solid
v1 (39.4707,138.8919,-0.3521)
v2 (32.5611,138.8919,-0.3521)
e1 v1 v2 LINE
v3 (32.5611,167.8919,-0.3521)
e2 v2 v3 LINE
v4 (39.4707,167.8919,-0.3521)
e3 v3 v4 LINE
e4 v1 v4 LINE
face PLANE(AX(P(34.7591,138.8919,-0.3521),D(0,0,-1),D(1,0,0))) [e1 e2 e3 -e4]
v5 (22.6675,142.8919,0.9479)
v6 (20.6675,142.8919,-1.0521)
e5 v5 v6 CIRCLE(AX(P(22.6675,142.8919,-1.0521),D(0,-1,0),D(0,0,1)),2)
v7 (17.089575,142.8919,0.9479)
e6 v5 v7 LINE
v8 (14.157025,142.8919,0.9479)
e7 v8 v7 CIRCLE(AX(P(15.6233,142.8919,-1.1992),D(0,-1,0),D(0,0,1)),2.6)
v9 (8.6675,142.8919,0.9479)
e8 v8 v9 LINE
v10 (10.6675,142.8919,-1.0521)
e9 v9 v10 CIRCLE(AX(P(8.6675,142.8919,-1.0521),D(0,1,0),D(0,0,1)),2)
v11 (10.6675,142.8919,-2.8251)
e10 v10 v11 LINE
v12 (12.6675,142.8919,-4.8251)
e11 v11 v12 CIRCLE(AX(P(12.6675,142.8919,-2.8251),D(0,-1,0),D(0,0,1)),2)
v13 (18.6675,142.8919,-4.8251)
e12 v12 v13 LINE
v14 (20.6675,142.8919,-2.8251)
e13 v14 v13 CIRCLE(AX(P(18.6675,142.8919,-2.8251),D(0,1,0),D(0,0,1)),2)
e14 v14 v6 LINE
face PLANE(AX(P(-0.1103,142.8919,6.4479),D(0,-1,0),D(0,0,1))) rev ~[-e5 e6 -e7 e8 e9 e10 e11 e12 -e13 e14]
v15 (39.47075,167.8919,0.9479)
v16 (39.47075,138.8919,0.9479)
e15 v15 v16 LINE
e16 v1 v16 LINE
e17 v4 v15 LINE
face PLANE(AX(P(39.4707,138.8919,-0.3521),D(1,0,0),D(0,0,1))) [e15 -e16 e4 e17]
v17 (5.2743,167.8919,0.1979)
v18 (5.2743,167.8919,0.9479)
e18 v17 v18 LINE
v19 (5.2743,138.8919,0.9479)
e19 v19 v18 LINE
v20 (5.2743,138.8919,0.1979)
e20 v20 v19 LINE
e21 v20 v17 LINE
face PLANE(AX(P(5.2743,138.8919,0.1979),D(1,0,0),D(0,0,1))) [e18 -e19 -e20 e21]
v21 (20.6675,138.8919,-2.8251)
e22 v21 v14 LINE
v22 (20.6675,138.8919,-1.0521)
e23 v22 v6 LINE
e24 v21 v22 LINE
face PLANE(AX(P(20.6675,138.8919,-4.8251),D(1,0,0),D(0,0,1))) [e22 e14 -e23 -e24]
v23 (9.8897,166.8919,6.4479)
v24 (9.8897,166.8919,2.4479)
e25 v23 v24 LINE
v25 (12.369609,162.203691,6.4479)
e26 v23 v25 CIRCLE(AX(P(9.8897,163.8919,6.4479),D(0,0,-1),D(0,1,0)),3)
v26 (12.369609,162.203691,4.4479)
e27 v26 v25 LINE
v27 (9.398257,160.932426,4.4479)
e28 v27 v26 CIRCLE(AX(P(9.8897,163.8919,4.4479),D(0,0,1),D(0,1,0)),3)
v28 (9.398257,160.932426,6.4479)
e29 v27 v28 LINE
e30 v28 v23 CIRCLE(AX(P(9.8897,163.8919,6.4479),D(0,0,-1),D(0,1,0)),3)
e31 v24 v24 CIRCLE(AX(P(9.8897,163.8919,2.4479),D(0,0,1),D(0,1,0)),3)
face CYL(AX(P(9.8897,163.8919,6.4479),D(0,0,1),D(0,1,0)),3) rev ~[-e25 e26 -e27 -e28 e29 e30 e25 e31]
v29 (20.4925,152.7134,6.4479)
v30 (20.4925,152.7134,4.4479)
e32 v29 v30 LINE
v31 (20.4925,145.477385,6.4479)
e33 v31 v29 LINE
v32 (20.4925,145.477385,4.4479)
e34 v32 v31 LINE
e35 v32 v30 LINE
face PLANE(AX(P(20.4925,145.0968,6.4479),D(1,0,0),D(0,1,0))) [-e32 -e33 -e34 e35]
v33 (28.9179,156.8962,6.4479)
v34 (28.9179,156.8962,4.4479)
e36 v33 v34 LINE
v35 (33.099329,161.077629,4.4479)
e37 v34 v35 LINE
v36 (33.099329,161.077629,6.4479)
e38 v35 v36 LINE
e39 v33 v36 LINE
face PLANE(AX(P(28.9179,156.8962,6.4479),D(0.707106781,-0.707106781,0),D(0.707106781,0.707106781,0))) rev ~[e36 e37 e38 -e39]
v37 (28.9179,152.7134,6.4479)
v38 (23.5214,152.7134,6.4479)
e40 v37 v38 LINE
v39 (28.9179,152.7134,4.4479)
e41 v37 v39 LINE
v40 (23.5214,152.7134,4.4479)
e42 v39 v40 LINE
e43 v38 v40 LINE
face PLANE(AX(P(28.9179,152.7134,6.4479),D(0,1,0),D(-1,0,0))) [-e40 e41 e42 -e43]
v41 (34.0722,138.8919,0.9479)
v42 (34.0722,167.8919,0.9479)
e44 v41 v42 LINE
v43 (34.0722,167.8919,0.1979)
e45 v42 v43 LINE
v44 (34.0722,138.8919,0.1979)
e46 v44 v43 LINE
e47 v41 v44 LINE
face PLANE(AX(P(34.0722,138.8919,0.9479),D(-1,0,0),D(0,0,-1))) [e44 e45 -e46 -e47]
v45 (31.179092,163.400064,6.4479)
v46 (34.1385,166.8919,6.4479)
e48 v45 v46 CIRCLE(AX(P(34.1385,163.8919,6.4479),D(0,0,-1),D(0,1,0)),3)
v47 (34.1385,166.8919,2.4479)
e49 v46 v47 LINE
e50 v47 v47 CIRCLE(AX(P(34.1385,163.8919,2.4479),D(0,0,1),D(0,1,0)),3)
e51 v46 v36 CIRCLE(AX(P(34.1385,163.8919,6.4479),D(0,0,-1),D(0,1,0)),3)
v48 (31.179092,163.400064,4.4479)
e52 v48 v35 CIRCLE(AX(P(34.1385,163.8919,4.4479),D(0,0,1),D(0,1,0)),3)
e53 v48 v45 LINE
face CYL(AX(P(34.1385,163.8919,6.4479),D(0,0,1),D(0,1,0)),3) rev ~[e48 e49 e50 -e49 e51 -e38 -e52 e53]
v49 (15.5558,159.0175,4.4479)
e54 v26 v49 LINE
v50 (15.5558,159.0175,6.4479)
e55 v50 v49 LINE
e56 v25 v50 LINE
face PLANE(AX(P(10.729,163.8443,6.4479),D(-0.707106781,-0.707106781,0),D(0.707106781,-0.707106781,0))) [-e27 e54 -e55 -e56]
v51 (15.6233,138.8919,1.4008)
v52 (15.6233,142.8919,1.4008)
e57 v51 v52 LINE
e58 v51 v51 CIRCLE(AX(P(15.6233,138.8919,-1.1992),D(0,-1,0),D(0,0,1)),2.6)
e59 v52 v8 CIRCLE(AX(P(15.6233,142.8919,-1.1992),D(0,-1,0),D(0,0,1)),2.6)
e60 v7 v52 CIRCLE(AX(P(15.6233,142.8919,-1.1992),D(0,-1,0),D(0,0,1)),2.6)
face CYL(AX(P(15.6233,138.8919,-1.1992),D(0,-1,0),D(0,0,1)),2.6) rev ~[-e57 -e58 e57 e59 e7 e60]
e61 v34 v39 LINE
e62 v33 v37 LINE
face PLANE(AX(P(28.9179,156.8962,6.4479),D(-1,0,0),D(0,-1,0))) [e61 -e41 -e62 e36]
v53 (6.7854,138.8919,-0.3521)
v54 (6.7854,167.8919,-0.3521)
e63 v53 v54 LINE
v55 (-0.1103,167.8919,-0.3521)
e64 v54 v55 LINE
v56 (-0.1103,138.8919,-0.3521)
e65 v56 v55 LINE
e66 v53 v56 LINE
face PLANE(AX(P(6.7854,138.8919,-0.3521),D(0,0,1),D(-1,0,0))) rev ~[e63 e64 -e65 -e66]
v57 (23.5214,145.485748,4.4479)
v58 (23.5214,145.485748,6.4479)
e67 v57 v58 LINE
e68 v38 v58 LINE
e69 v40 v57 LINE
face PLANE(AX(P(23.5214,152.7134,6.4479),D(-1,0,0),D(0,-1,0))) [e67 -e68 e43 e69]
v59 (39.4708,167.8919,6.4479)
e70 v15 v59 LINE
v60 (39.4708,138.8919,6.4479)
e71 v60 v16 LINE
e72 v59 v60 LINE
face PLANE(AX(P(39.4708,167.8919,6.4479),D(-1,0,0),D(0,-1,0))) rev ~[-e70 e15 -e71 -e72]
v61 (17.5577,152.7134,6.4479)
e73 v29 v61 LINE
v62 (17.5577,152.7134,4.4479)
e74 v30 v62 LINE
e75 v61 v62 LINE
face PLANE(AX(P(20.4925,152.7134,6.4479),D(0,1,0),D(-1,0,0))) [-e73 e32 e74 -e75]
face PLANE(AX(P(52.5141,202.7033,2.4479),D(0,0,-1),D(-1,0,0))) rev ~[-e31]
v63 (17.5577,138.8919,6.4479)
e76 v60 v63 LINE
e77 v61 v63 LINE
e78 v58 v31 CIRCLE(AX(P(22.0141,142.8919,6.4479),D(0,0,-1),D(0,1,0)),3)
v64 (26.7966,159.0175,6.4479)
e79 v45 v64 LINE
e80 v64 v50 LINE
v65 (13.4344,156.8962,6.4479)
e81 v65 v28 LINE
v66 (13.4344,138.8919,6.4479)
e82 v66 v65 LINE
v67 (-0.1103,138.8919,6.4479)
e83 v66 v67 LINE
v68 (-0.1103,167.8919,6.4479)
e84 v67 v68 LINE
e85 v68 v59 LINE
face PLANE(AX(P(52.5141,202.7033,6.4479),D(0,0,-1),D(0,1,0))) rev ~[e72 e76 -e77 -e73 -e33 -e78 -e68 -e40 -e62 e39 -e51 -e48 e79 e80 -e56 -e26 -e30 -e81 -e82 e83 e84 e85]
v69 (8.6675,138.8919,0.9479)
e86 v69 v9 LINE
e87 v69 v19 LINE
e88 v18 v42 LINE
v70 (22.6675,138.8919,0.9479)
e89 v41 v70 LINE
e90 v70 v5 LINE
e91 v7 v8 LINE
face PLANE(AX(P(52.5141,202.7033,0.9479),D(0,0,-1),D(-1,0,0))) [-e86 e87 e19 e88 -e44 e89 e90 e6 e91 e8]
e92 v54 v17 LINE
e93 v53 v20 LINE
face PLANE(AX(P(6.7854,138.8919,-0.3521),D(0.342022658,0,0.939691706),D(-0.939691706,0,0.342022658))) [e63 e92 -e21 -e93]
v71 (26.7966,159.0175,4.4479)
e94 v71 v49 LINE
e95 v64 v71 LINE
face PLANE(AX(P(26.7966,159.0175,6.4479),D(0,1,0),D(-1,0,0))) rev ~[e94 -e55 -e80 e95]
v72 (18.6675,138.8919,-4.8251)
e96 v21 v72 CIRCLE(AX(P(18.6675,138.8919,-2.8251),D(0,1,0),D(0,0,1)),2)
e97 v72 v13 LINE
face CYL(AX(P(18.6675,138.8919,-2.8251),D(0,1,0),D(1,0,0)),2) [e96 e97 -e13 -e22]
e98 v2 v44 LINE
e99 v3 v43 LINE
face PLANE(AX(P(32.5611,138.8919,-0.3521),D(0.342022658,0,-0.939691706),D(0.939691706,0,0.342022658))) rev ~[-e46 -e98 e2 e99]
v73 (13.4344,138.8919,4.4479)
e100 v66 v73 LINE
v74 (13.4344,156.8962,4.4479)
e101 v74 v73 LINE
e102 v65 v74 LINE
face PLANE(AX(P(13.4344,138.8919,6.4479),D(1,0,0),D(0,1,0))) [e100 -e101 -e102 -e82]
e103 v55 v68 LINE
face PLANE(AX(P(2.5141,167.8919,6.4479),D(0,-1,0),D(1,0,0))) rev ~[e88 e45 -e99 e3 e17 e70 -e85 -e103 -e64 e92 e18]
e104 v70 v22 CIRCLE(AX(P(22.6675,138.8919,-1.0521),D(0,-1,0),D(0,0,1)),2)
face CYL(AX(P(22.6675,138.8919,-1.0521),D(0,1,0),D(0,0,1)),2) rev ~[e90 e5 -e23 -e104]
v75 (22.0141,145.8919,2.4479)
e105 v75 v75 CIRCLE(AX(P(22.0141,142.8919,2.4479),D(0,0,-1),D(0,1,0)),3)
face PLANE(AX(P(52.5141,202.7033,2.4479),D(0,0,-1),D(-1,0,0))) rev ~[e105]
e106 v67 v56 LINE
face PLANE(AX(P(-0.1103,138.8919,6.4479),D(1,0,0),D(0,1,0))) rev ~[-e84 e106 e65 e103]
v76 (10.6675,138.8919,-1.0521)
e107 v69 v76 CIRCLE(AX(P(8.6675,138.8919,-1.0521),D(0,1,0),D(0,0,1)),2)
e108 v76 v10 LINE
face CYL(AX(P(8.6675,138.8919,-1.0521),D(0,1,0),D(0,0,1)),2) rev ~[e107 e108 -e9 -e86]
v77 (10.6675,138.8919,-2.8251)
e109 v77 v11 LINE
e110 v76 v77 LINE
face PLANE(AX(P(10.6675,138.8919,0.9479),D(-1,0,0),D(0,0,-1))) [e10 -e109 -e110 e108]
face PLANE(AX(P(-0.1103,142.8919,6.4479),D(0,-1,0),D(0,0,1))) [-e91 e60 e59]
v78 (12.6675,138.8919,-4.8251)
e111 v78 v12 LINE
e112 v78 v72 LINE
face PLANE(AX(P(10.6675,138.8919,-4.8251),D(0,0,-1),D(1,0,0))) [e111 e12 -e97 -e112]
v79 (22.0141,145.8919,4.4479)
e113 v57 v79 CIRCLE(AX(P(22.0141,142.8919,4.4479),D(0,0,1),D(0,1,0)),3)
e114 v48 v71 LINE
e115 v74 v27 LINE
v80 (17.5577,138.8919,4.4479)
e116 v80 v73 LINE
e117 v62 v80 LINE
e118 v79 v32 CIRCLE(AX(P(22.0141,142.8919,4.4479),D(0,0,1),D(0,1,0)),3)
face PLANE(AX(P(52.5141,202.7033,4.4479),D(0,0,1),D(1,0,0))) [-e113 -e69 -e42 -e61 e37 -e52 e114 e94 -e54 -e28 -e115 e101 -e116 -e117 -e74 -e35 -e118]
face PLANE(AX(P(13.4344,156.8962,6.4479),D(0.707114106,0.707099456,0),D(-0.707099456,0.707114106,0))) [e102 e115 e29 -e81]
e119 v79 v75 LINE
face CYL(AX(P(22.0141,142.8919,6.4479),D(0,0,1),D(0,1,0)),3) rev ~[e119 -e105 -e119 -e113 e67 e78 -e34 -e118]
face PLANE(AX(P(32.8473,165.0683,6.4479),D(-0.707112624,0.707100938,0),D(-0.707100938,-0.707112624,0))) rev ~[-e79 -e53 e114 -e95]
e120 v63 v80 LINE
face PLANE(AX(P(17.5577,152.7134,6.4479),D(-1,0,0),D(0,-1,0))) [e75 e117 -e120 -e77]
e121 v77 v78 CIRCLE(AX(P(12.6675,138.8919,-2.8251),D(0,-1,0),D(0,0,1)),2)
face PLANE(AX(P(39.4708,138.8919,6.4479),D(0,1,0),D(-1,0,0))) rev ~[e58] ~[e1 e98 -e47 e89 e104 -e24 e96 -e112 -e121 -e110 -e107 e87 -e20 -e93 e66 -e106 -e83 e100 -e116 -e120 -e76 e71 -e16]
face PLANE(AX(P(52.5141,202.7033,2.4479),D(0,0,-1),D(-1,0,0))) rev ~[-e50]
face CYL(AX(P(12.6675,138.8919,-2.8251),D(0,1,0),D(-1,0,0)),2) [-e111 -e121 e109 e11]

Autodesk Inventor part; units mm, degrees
ref_plane "YZ Plane" through (0, 0, 0) normal (1, 0, 0) x (0, 1, 0)
ref_plane "XZ Plane" through (0, 0, 0) normal (0, 1, 0) x (-1, 0, 0)
ref_plane "XY Plane" through (0, 0, 0) normal (0, 0, 1) x (1, 0, 0)
ref_plane "Work Plane1" through (52.5141, 202.7033, 6.4479) normal (0, 0, -1) x (0, 1, 0)
sketch "Sketch1" plane through (52.5141, 202.7033, 6.4479) normal (0, 0, -1) x (0, 1, 0)
  circle A0 centre (-59.8114, -30.5) radius 1.4 construction
  circle A1 centre (-38.8114, -18.3756) radius 1.4 projected
  circle A2 centre (-38.8114, -42.6244) radius 1.4 construction
  circle A3 centre (41, 0) radius 1.65 projected
  circle A4 centre (-9, 0) radius 1.65 projected
  circle A5 centre (-9, 50) radius 1.65 projected
  circle A6 centre (41, 50) radius 1.65 projected
  circle A7 centre (16, 50) radius 1.65 projected
  circle A8 centre (-9, 25) radius 1.65 projected
  circle A9 centre (16, 0) radius 1.65 projected
  circle A10 centre (41, 25) radius 1.65 projected
  line L0 (80, 55) -> (-80, 55) projected
  line L1 (-80, 55) -> (-80, -55) projected
  line L2 (-80, -55) -> (80, -55) projected
  line L3 (80, -55) -> (80, 55) projected
  line L4 (-36.5, 0) -> (-36.5, -50) projected
  line L5 (-14, 0) -> (-36.5, 0) projected
  line L6 (-14, -5) -> (-14, 0) projected
  line L7 (72, -5) -> (-14, -5) projected
  line L8 (72, -50) -> (72, -5) projected
  line L9 (-36.5, -50) -> (72, -50) projected
  line L10 (-4, 45) -> (-4, 5) projected
  line L11 (36, 45) -> (-4, 45) projected
  line L12 (36, 5) -> (36, 45) projected
  line L13 (-4, 5) -> (36, 5) projected
  line L14 (-64.5989, -17.0433) -> (-64.5989, -57.0433) construction
  line L15 (-64.5989, -57.0433) -> (-34.5989, -57.0433) construction
  line L16 (-34.5989, -57.0433) -> (-34.5989, -17.0433) construction
  line L17 (-34.5989, -17.0433) -> (-64.5989, -17.0433) construction
  line L18 (-34.8114, -13.0433) -> (-63.8114, -13.0433)
  line L19 (-63.8114, -13.0433) -> (-63.8114, -52.6244)
  line L20 (-63.8114, -52.6244) -> (-34.8114, -52.6244)
  line L21 (-34.8114, -52.6244) -> (-34.8114, -13.0433)
  circle A11 centre (-59.8114, -30.5) radius 3
  circle A12 centre (-38.8114, -18.3756) radius 3
  circle A13 centre (-38.8114, -42.6244) radius 3 construction
  line L22 (-36.5, -35.1157) -> (-41.75, -35.1157) construction
  line L23 (-41.75, -35.1157) -> (-41.75, -38.5657) construction
  line L24 (-41.75, -38.5657) -> (-56.86, -38.5657) construction
  line L25 (-56.86, -38.5657) -> (-56.86, -35.1157) construction
  line L26 (-56.86, -35.1157) -> (-60.26, -35.1157) construction
  line L27 (-60.26, -35.1157) -> (-60.26, -52.0657) construction
  line L28 (-60.26, -52.0657) -> (-36.5, -52.0657) construction
  line L29 (-36.5, -52.0657) -> (-36.5, -35.1157) construction
  line L30 (-41.75, -28.3657) -> (-36.5, -28.3657) construction
  line L31 (-36.5, -28.3657) -> (-36.5, -25.0657) construction
  line L32 (-36.5, -25.0657) -> (-60.26, -25.0657) construction
  line L33 (-60.26, -25.0657) -> (-60.26, -28.3657) construction
  line L34 (-60.26, -28.3657) -> (-56.86, -28.3657) construction
  line L35 (-56.86, -28.3657) -> (-56.86, -27.0942) construction
  line L36 (-56.86, -27.0942) -> (-41.75, -27.0942) construction
  line L37 (-41.75, -27.0942) -> (-41.75, -28.3657) construction
  line L38 (-56.86, -35.1157) -> (-60.26, -35.1157) construction
  line L39 (-56.86, -38.5657) -> (-56.86, -35.1157) construction
  line L40 (-41.75, -38.5657) -> (-56.86, -38.5657) construction
  line L41 (-41.75, -35.1157) -> (-41.75, -38.5657) construction
  line L42 (-36.5, -35.1157) -> (-41.75, -35.1157) construction
  line L43 (-36.5, -35.05) -> (-36.5, -35.1157) construction
  line L44 (-36.5, -35.05) -> (-56.86, -35.05) construction
  line L45 (-36.5, -34.78) -> (-36.5, -35.05) construction
  line L46 (-36.5, -34.78) -> (-56.86, -34.78) construction
  line L47 (-36.5, -34.51) -> (-36.5, -34.78) construction
  line L48 (-36.5, -34.51) -> (-56.86, -34.51) construction
  line L49 (-36.5, -34.24) -> (-36.5, -34.51) construction
  line L50 (-36.5, -34.24) -> (-56.86, -34.24) construction
  line L51 (-36.5, -33.97) -> (-36.5, -34.24) construction
  line L52 (-36.5, -33.97) -> (-56.86, -33.97) construction
  line L53 (-36.5, -33.7) -> (-36.5, -33.97) construction
  line L54 (-36.5, -33.7) -> (-56.86, -33.7) construction
  line L55 (-36.5, -33.43) -> (-36.5, -33.7) construction
  line L56 (-36.5, -33.43) -> (-56.86, -33.43) construction
  line L57 (-36.5, -33.16) -> (-36.5, -33.43) construction
  line L58 (-36.5, -33.16) -> (-56.86, -33.16) construction
  line L59 (-36.5, -32.89) -> (-36.5, -33.16) construction
  line L60 (-36.5, -32.89) -> (-56.86, -32.89) construction
  line L61 (-36.5, -32.62) -> (-36.5, -32.89) construction
  line L62 (-36.5, -32.62) -> (-56.86, -32.62) construction
  line L63 (-36.5, -32.35) -> (-36.5, -32.62) construction
  line L64 (-36.5, -32.35) -> (-56.86, -32.35) construction
  line L65 (-36.5, -32.08) -> (-36.5, -32.35) construction
  line L66 (-36.5, -32.08) -> (-56.86, -32.08) construction
  line L67 (-36.5, -31.81) -> (-36.5, -32.08) construction
  line L68 (-36.5, -31.81) -> (-56.86, -31.81) construction
  line L69 (-36.5, -31.54) -> (-36.5, -31.81) construction
  line L70 (-36.5, -31.54) -> (-56.86, -31.54) construction
  line L71 (-36.5, -31.27) -> (-36.5, -31.54) construction
  line L72 (-36.5, -31.27) -> (-56.86, -31.27) construction
  line L73 (-36.5, -31) -> (-36.5, -31.27) construction
  line L74 (-36.5, -31) -> (-56.86, -31) construction
  line L75 (-36.5, -30.73) -> (-36.5, -31) construction
  line L76 (-36.5, -30.73) -> (-56.86, -30.73) construction
  line L77 (-36.5, -30.46) -> (-36.5, -30.73) construction
  line L78 (-36.5, -30.46) -> (-56.86, -30.46) construction
  line L79 (-36.5, -30.19) -> (-36.5, -30.46) construction
  line L80 (-36.5, -30.19) -> (-56.86, -30.19) construction
  line L81 (-36.5, -29.92) -> (-36.5, -30.19) construction
  line L82 (-36.5, -29.92) -> (-56.86, -29.92) construction
  line L83 (-36.5, -29.65) -> (-36.5, -29.92) construction
  line L84 (-36.5, -29.65) -> (-56.86, -29.65) construction
  line L85 (-36.5, -29.38) -> (-36.5, -29.65) construction
  line L86 (-36.5, -29.38) -> (-56.86, -29.38) construction
  line L87 (-36.5, -29.11) -> (-36.5, -29.38) construction
  line L88 (-36.5, -29.11) -> (-56.86, -29.11) construction
  line L89 (-36.5, -28.84) -> (-36.5, -29.11) construction
  line L90 (-36.5, -28.84) -> (-56.86, -28.84) construction
  line L91 (-36.5, -28.3657) -> (-36.5, -28.84) construction
  line L92 (-41.75, -28.3657) -> (-36.5, -28.3657) construction
  line L93 (-41.75, -27.0942) -> (-41.75, -28.3657) construction
  line L94 (-56.86, -27.0942) -> (-41.75, -27.0942) construction
  line L95 (-56.86, -28.3657) -> (-56.86, -27.0942) construction
  line L96 (-60.26, -28.3657) -> (-56.86, -28.3657) construction
  line L97 (-60.26, -35.1157) -> (-60.26, -28.3657) construction
  line L98 (-60.26, -25.0657) -> (-36.5, -25.0657) construction
  line L99 (-36.5, -25.0657) -> (-36.5, -52.0657) construction
  line L100 (-60.26, -52.0657) -> (-60.26, -25.0657) construction
  line L101 (-57.1632, -22.5233) -> (-33.4032, -22.5233) construction
  line L102 (-33.4032, -22.5233) -> (-33.4032, -49.5233) construction
  line L103 (-33.4032, -49.5233) -> (-57.1632, -49.5233) construction
  line L104 (-57.1632, -49.5233) -> (-57.1632, -22.5233) construction
  circle A14 centre (-38.8114, -42.6244) radius 3
  point P0 (-202.7033, -52.5141)
  point P1 (-56.7146, -27.9576)
  dimension "d0" = 4
  dimension "d2" = 4
  dimension "d3" = 4
  dimension "d4" = 6
  dimension "d5" = 6
  dimension "d6" = 6
  dimension "d10" = 10
extrude "Extrusion1" add sketch "Sketch1" along normal blind 4 contours L18 L21 L9 L4 A14 A12 | L4 A12 A14 L9 L21 L20 L19 L18
sketch "Sketch2" plane through (52.5141, 202.7033, 2.4479) normal (0, 0, -1) x (-1, 0, 0)
  circle A0 centre (42.6244, -38.8114) radius 3 projected
  circle A1 centre (18.3756, -38.8114) radius 3 projected
  circle A2 centre (30.5, -59.8114) radius 3 projected
  line L0 (13.0433, -34.8114) -> (13.0433, -63.8114) projected
  line L1 (13.0433, -63.8114) -> (52.6244, -63.8114) projected
  line L2 (52.6244, -63.8114) -> (52.6244, -34.8114) projected
  line L3 (52.6244, -34.8114) -> (13.0433, -34.8114) projected
  point P0 (52.5141, -202.7033)
extrude "Extrusion2" add sketch "Sketch2" along normal blind 1.5 contours A0 | A1 | A2 | L3 L2 L1 L0
sketch "Sketch3" plane through (-0.1103, 138.8919, 6.4479) normal (0, -1, 0) x (1, 0, 0)
  line L0 (39.581, 0) -> (0, 0) construction
  line L1 (0, 0) -> (0, -5.5) construction
  line L2 (39.581, -5.5) -> (0, -5.5) projected
  line L3 (39.581, 0) -> (39.581, -5.5) projected
  line L4 (17.5087, -7.4479) -> (17.5087, -6.8479) construction
  line L5 (17.5087, -6.8479) -> (24.2587, -6.8479) construction
  line L6 (24.2587, -6.8479) -> (24.2587, -7.4479) construction
  line L7 (27.5587, -7.4479) -> (24.2587, -7.4479) construction
  line L8 (27.5587, -6.4479) -> (27.5587, -7.4479) construction
  line L9 (27.5587, -6.4479) -> (0.5587, -6.4479) construction
  line L10 (0.5587, -6.4479) -> (0.5587, -7.4479) construction
  line L11 (17.5087, -7.4479) -> (0.5587, -7.4479) construction
  line L12 (39.581, 0) -> (39.581, -5.5) construction
  line L13 (39.581, -5.5) -> (34.1825, -5.5)
  line L14 (34.1825, -5.5) -> (34.1825, -6.25)
  line L15 (34.8694, -6.8) -> (39.581, -6.8)
  line L16 (39.581, -6.8) -> (39.581, -5.5)
  line L17 (39.581, -6.8) -> (32.6714, -6.8)
  line L18 (32.6714, -6.8) -> (34.1825, -6.25)
  line L19 (12.6726, -5.5) -> (12.6726, -6.5) projected
  line L20 (0, 0) -> (0, -5.5) construction
  line L21 (0, -5.5) -> (5.3846, -5.5)
  line L22 (6.8957, -6.8) -> (0, -6.8)
  line L23 (0, -6.8) -> (0, -5.5)
  line L24 (6.8957, -6.8) -> (6.8957, -6.8)
  line L25 (0, -5.5) -> (39.581, -5.5) projected
  line L26 (6.8957, -6.8) -> (5.3846, -6.25)
  line L27 (5.3846, -6.25) -> (5.3846, -5.5)
  line L28 (5.9957, -5.5) -> (33.4957, -5.5) construction
  line L29 (33.4957, -5.5) -> (33.4957, -6.5) construction
  line L30 (33.4957, -6.5) -> (5.9957, -6.5) construction
  line L31 (5.9957, -6.5) -> (5.9957, -5.5) construction
  point P0 (8.981, -5.5)
  dimension "d42" = 1.3
  dimension "d43" = 110
  dimension "d45" = 0.75
  dimension "h1" = 0.75
  dimension "d47" = 110
  dimension "d48" = 27.5
  dimension "d49" = 1
  dimension "d50" = 0.9
  dimension "d51" = 0
extrude "Extrusion3" add sketch "Sketch3" against normal up to surface (29 mm away)
sketch "Sketch6" plane through (52.5141, 202.7033, 6.4479) normal (0, 0, 1) x (1, 0, 0)
  line L0 (-13.0433, -34.8114) -> (-13.0433, -63.8114) projected
  line L1 (-52.6244, -34.8114) -> (-13.0433, -34.8114) projected
  line L2 (-52.6244, -63.8114) -> (-52.6244, -34.8114) projected
  line L3 (-13.0433, -63.8114) -> (-52.6244, -63.8114) projected
  line L4 (-23.5962, -45.8071) -> (-17.5454, -39.7563)
  line L5 (-17.5454, -39.7563) -> (-19.6668, -37.635)
  line L6 (-19.6668, -37.635) -> (-25.7175, -43.6858)
  line L7 (-25.7175, -43.6858) -> (-23.5962, -45.8071)
  line L8 (-23.5962, -45.8071) -> (-19.6668, -37.635) construction
  line L9 (-17.5454, -39.7563) -> (-25.7175, -43.6858) construction
  line L10 (-39.0797, -45.8071) -> (-43.9064, -40.9803)
  line L11 (-43.9064, -40.9803) -> (-41.7851, -38.859)
  line L12 (-41.7851, -38.859) -> (-36.9583, -43.6858)
  line L13 (-36.9583, -43.6858) -> (-39.0797, -45.8071)
  line L14 (-39.0797, -45.8071) -> (-41.7851, -38.859) construction
  line L15 (-43.9064, -40.9803) -> (-36.9583, -43.6858) construction
  line L16 (-25.7175, -43.6858) -> (-36.9583, -43.6858)
  line L17 (-23.5962, -45.8071) -> (-23.5962, -49.9899)
  line L18 (-23.5962, -49.9899) -> (-39.0797, -49.9899)
  line L19 (-39.0797, -49.9899) -> (-39.0797, -45.8071)
  line L20 (-32.0216, -49.9899) -> (-28.9927, -49.9899)
  line L21 (-28.9927, -49.9899) -> (-28.9927, -57.6065)
  line L22 (-28.9927, -57.6065) -> (-32.0216, -57.6065)
  line L23 (-32.0216, -57.6065) -> (-32.0216, -49.9899)
  line L24 (-39.0797, -45.8071) -> (-39.0797, -49.9899)
  line L25 (-45.7287, -63.8114) -> (-45.7287, -34.8114) construction
  line L26 (-39.0797, -49.9899) -> (-34.9564, -49.9899)
  line L27 (-34.9564, -49.9899) -> (-34.9564, -63.8114)
  line L28 (-34.9564, -63.8114) -> (-39.0797, -63.8114)
  line L29 (-39.0797, -63.8114) -> (-39.0797, -49.9899)
  point P0 (-52.5141, -202.7033)
  point P1 (-21.6315, -41.7211)
  point P2 (-40.4324, -42.333)
  dimension "d35" = 3
  dimension "d36" = 3
  dimension "d37" = 45
  dimension "d38" = 0
extrude "Extrusion6" cut sketch "Sketch6" against normal blind 2 contours L3 L29 L18 L27 | L18 L19 L13 L16 L7 L17 | L18 L21 L22 L23 | L10 L11 L12 L13 | L6 L5 L4 L7
sketch "Sketch7" plane through (-0.1103, 138.8919, 6.4479) normal (0, -1, 0) x (0, 0, 1)
  line L0 (-11.273, -20.7778) -> (-5.5, -20.7778)
  line L1 (-5.5, -20.7778) -> (-5.5, -10.7778)
  line L2 (-5.5, -10.7778) -> (-11.273, -10.7778)
  line L3 (-11.273, -10.7778) -> (-11.273, -20.7778)
  line L4 (-5.5, -34.1825) -> (-5.5, -5.3846) projected
  point P0 (-6.8, -32.6714)
  dimension "d53" = 10
extrude "Extrusion7" add sketch "Sketch7" against normal blind 4
fillet "Fillet1" radius 2 4 edges at (10.6675, 140.8919, -4.8251) (20.6675, 140.8919, -4.8251) (10.6675, 140.8919, 0.9479) (20.6675, 140.8919, 0.9479)
sketch "Sketch8" plane through (-0.1103, 138.8919, 6.4479) normal (0, -1, 0) x (0, 0, 1)
  line L0 (0, 0) -> (-6.8, 0) projected
  line L1 (0, 0) -> (-6.8, 0) projected
  circle A0 centre (-7.6471, -15.7336) radius 2.6
  line L2 (-6.8, 0) -> (-6.8, 0) projected
  point P0 (-6.4479, -0.1103)
  dimension "d58" = 5.2
extrude "Extrusion8" cut sketch "Sketch8" against normal up to surface (4 mm away)
equation "\"d45\" = h1"
properties part number "cellSTORM_v5_chiptray_old_0"
